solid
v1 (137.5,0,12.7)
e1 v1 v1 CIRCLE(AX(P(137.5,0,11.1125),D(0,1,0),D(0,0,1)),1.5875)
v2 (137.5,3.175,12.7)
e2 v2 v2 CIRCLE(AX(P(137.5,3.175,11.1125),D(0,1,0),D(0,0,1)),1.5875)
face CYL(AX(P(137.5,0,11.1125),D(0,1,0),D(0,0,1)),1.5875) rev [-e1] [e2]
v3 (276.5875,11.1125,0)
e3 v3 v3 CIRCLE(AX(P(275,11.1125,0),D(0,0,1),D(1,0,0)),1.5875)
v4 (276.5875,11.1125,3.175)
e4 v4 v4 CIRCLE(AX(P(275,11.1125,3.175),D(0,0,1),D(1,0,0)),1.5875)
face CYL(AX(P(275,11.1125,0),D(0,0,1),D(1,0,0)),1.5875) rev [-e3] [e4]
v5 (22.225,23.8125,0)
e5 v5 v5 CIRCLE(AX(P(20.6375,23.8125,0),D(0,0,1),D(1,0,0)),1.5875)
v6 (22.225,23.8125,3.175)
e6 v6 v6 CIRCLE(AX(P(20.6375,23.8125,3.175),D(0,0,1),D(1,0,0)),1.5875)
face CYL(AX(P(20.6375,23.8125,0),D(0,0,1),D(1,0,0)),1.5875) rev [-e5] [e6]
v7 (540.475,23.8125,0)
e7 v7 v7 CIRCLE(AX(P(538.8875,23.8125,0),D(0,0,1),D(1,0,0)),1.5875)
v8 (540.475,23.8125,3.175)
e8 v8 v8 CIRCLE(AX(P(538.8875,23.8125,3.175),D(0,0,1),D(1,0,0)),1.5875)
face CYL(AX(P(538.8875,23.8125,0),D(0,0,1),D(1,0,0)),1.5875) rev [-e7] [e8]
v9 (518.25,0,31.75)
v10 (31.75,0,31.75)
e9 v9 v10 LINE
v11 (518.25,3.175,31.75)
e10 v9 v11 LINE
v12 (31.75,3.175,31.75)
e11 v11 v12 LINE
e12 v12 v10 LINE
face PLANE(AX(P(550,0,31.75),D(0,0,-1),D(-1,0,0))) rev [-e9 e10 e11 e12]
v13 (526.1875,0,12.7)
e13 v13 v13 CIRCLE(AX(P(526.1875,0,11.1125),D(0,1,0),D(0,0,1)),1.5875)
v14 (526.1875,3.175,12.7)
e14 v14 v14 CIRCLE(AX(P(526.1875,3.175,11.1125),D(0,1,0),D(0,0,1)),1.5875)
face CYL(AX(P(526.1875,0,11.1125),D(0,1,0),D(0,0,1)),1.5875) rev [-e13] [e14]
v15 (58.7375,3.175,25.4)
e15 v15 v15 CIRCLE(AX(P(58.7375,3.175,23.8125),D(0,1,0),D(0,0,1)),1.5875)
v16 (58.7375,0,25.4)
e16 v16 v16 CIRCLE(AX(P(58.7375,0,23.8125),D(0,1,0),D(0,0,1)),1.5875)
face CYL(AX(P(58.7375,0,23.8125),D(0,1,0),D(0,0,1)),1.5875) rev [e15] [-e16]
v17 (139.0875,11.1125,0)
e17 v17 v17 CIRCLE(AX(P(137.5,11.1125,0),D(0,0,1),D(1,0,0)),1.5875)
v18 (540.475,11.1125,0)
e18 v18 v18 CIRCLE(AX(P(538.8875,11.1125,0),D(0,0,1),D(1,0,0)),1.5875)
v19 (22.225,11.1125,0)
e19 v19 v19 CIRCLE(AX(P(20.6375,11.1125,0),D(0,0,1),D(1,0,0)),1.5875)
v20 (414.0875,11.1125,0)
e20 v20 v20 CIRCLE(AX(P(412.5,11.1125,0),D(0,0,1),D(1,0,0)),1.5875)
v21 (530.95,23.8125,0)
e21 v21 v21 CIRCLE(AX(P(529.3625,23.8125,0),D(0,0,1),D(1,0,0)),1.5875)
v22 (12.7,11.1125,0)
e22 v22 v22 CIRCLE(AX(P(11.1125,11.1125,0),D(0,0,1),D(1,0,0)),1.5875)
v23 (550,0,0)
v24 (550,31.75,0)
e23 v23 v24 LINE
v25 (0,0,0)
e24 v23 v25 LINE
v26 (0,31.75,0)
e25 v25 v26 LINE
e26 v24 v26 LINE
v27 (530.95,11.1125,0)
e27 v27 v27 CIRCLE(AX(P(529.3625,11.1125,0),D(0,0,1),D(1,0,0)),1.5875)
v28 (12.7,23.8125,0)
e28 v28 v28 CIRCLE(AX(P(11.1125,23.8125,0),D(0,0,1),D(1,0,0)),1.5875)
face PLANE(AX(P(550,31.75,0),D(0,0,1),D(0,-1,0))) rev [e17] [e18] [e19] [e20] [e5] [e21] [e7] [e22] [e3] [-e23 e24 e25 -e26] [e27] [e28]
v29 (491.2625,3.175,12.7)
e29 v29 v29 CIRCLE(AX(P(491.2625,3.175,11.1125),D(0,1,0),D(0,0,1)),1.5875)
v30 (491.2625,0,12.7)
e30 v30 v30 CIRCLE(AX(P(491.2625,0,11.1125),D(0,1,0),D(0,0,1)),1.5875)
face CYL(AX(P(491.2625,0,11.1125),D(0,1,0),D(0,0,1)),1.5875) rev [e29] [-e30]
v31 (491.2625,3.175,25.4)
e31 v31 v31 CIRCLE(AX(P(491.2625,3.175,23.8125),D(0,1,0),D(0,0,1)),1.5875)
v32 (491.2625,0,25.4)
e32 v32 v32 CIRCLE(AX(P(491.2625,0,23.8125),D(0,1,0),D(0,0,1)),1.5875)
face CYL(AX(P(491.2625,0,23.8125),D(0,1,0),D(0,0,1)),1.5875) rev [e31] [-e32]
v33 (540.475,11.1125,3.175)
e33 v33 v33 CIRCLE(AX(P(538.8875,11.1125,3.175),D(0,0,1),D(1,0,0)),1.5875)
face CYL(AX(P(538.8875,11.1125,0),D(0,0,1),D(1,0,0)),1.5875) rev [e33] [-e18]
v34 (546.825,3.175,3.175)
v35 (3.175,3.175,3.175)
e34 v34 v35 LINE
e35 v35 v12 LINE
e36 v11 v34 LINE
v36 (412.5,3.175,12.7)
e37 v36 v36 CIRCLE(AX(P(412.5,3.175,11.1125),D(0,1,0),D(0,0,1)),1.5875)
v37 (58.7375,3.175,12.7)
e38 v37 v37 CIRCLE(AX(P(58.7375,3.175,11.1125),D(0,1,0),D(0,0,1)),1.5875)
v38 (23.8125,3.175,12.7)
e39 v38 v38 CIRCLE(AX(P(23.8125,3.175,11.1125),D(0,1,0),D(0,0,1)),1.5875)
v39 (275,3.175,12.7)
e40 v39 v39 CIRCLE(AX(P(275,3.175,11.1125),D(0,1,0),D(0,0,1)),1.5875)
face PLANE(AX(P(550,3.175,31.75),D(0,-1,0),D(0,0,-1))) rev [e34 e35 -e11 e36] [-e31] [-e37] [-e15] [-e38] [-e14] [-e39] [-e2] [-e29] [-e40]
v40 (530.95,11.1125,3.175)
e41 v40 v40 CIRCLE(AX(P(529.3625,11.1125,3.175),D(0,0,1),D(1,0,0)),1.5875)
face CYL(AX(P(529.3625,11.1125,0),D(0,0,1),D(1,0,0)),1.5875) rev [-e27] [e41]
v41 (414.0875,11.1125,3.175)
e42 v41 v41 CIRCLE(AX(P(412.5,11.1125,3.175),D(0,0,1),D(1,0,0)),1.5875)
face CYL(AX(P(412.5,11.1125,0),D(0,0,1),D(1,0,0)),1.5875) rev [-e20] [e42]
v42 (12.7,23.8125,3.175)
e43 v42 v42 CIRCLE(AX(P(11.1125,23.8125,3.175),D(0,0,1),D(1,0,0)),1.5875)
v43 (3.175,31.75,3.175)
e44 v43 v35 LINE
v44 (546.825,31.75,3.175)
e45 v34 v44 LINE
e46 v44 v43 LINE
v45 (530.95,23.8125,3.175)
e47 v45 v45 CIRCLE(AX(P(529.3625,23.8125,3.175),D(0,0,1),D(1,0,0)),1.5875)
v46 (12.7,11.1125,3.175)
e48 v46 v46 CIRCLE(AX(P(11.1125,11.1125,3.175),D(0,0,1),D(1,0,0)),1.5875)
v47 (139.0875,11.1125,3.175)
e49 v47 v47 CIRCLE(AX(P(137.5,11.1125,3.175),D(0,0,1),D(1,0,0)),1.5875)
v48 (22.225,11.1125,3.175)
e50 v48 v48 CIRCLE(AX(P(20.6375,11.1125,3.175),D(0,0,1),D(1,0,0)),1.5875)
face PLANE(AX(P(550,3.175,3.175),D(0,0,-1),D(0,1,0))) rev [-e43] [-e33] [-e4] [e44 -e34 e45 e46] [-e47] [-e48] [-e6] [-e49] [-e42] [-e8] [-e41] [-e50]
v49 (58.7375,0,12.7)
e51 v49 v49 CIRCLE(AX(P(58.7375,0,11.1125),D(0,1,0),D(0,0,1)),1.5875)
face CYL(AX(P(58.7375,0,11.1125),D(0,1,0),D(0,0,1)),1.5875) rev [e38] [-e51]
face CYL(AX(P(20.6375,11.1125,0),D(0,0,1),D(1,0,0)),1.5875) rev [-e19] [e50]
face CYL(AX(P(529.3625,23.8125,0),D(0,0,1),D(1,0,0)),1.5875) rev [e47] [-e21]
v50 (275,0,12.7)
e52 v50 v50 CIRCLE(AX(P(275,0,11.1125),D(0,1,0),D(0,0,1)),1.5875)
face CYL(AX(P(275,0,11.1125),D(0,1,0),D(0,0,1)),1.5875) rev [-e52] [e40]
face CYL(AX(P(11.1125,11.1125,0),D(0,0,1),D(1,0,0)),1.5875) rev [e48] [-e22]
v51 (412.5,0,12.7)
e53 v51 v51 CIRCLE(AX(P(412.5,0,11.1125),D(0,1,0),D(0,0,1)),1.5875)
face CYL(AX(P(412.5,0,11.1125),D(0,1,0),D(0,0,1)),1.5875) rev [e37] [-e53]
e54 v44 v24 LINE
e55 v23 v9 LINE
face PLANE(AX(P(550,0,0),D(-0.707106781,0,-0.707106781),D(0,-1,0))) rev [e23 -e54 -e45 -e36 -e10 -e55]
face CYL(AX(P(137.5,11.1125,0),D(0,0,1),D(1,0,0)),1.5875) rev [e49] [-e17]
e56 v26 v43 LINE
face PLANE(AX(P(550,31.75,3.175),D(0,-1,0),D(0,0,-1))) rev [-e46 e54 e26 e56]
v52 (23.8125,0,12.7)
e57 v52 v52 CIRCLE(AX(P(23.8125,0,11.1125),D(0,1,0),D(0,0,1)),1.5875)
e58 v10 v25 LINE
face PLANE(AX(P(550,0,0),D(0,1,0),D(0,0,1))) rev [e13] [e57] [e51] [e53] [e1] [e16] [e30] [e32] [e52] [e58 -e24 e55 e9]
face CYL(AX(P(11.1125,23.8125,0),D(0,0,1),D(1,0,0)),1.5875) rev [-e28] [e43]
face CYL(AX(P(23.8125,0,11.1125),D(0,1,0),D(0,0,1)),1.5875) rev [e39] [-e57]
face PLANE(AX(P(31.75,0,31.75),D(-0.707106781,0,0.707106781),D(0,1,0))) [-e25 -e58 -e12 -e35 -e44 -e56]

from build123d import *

# Parameters (mm, degrees)
BOSS_EXTRUDE1_DEPTH          = 550
CHAMFER6_SIZE                = 31.75
CHAMFER7_SIZE                = 31.75
TOPHOLES_SKETCH3_R           = 1.5875
TOPHOLES_CUT_EXTRUDE2_DEPTH  = 552.656227306
SIDEHOLES_SKETCH4_R          = 1.5875
SIDEHOLES_CUT_EXTRUDE3_DEPTH = 552.656227306


with BuildPart() as part:
    # Sketch1 → Boss-Extrude1 (new body)
    with BuildSketch(Plane(origin=(0, 0, 0), x_dir=(0, 0, -1), z_dir=(1, 0, 0))):
        Polygon((0, 0), (-31.75, 0), (-31.75, 3.175), (-3.175, 3.175), (-3.175, 31.75), (0, 31.75), align=None)
    extrude(amount=BOSS_EXTRUDE1_DEPTH)

    # Chamfer6
    chamfer6_edges = [part.edges().sort_by_distance(p)[0] for p in [
        (550, 1.5875, 31.75),
    ]]
    chamfer(chamfer6_edges, length=CHAMFER6_SIZE - 0.0001)  # a hair under: the kernel refuses the full size

    # Chamfer7
    chamfer7_edges = [part.edges().sort_by_distance(p)[0] for p in [
        (0, 1.5875, 31.75),
    ]]
    chamfer(chamfer7_edges, length=CHAMFER7_SIZE - 0.0001)  # a hair under: the kernel refuses the full size

    # TopHoles-Sketch3 → TopHoles-Cut-Extrude2 (cut, through all)
    with BuildSketch(Plane(origin=(0, 3.175, 0), x_dir=(1, 0, 0), z_dir=(0, 1, 0))):
        with Locations(Location((58.7375, -23.8125, 0), (0, 0, 270))):
            Circle(TOPHOLES_SKETCH3_R)
        with Locations(Location((491.2625, -23.8125, 0), (0, 0, 270))):
            Circle(TOPHOLES_SKETCH3_R)
        with Locations(Location((491.2625, -11.1125, 0), (0, 0, 270))):
            Circle(TOPHOLES_SKETCH3_R)
        with Locations(Location((58.7375, -11.1125, 0), (0, 0, 270))):
            Circle(TOPHOLES_SKETCH3_R)
        with Locations(Location((526.1875, -11.1125, 0), (0, 0, 270))):
            Circle(TOPHOLES_SKETCH3_R)
        with Locations(Location((23.8125, -11.1125, 0), (0, 0, 270))):
            Circle(TOPHOLES_SKETCH3_R)
        with Locations(Location((275, -11.1125, 0), (0, 0, 270))):
            Circle(TOPHOLES_SKETCH3_R)
        with Locations(Location((137.5, -11.1125, 0), (0, 0, 270))):
            Circle(TOPHOLES_SKETCH3_R)
        with Locations(Location((412.5, -11.1125, 0), (0, 0, 270))):
            Circle(TOPHOLES_SKETCH3_R)
    extrude(amount=-TOPHOLES_CUT_EXTRUDE2_DEPTH, mode=Mode.SUBTRACT)

    # SideHoles-Sketch4 → SideHoles-Cut-Extrude3 (cut, through all)
    with BuildSketch(Plane.XY.offset(3.175)):
        with Locations((11.1125, 23.8125)):
            Circle(SIDEHOLES_SKETCH4_R)
        with Locations((529.3625, 23.8125)):
            Circle(SIDEHOLES_SKETCH4_R)
        with Locations((20.6375, 23.8125)):
            Circle(SIDEHOLES_SKETCH4_R)
        with Locations((538.8875, 23.8125)):
            Circle(SIDEHOLES_SKETCH4_R)
        with Locations((11.1125, 11.1125)):
            Circle(SIDEHOLES_SKETCH4_R)
        with Locations((20.6375, 11.1125)):
            Circle(SIDEHOLES_SKETCH4_R)
        with Locations((529.3625, 11.1125)):
            Circle(SIDEHOLES_SKETCH4_R)
        with Locations((538.8875, 11.1125)):
            Circle(SIDEHOLES_SKETCH4_R)
        with Locations((137.5, 11.1125)):
            Circle(SIDEHOLES_SKETCH4_R)
        with Locations((275, 11.1125)):
            Circle(SIDEHOLES_SKETCH4_R)
        with Locations((412.5, 11.1125)):
            Circle(SIDEHOLES_SKETCH4_R)
    extrude(amount=-SIDEHOLES_CUT_EXTRUDE3_DEPTH, mode=Mode.SUBTRACT)


solid = part.part
